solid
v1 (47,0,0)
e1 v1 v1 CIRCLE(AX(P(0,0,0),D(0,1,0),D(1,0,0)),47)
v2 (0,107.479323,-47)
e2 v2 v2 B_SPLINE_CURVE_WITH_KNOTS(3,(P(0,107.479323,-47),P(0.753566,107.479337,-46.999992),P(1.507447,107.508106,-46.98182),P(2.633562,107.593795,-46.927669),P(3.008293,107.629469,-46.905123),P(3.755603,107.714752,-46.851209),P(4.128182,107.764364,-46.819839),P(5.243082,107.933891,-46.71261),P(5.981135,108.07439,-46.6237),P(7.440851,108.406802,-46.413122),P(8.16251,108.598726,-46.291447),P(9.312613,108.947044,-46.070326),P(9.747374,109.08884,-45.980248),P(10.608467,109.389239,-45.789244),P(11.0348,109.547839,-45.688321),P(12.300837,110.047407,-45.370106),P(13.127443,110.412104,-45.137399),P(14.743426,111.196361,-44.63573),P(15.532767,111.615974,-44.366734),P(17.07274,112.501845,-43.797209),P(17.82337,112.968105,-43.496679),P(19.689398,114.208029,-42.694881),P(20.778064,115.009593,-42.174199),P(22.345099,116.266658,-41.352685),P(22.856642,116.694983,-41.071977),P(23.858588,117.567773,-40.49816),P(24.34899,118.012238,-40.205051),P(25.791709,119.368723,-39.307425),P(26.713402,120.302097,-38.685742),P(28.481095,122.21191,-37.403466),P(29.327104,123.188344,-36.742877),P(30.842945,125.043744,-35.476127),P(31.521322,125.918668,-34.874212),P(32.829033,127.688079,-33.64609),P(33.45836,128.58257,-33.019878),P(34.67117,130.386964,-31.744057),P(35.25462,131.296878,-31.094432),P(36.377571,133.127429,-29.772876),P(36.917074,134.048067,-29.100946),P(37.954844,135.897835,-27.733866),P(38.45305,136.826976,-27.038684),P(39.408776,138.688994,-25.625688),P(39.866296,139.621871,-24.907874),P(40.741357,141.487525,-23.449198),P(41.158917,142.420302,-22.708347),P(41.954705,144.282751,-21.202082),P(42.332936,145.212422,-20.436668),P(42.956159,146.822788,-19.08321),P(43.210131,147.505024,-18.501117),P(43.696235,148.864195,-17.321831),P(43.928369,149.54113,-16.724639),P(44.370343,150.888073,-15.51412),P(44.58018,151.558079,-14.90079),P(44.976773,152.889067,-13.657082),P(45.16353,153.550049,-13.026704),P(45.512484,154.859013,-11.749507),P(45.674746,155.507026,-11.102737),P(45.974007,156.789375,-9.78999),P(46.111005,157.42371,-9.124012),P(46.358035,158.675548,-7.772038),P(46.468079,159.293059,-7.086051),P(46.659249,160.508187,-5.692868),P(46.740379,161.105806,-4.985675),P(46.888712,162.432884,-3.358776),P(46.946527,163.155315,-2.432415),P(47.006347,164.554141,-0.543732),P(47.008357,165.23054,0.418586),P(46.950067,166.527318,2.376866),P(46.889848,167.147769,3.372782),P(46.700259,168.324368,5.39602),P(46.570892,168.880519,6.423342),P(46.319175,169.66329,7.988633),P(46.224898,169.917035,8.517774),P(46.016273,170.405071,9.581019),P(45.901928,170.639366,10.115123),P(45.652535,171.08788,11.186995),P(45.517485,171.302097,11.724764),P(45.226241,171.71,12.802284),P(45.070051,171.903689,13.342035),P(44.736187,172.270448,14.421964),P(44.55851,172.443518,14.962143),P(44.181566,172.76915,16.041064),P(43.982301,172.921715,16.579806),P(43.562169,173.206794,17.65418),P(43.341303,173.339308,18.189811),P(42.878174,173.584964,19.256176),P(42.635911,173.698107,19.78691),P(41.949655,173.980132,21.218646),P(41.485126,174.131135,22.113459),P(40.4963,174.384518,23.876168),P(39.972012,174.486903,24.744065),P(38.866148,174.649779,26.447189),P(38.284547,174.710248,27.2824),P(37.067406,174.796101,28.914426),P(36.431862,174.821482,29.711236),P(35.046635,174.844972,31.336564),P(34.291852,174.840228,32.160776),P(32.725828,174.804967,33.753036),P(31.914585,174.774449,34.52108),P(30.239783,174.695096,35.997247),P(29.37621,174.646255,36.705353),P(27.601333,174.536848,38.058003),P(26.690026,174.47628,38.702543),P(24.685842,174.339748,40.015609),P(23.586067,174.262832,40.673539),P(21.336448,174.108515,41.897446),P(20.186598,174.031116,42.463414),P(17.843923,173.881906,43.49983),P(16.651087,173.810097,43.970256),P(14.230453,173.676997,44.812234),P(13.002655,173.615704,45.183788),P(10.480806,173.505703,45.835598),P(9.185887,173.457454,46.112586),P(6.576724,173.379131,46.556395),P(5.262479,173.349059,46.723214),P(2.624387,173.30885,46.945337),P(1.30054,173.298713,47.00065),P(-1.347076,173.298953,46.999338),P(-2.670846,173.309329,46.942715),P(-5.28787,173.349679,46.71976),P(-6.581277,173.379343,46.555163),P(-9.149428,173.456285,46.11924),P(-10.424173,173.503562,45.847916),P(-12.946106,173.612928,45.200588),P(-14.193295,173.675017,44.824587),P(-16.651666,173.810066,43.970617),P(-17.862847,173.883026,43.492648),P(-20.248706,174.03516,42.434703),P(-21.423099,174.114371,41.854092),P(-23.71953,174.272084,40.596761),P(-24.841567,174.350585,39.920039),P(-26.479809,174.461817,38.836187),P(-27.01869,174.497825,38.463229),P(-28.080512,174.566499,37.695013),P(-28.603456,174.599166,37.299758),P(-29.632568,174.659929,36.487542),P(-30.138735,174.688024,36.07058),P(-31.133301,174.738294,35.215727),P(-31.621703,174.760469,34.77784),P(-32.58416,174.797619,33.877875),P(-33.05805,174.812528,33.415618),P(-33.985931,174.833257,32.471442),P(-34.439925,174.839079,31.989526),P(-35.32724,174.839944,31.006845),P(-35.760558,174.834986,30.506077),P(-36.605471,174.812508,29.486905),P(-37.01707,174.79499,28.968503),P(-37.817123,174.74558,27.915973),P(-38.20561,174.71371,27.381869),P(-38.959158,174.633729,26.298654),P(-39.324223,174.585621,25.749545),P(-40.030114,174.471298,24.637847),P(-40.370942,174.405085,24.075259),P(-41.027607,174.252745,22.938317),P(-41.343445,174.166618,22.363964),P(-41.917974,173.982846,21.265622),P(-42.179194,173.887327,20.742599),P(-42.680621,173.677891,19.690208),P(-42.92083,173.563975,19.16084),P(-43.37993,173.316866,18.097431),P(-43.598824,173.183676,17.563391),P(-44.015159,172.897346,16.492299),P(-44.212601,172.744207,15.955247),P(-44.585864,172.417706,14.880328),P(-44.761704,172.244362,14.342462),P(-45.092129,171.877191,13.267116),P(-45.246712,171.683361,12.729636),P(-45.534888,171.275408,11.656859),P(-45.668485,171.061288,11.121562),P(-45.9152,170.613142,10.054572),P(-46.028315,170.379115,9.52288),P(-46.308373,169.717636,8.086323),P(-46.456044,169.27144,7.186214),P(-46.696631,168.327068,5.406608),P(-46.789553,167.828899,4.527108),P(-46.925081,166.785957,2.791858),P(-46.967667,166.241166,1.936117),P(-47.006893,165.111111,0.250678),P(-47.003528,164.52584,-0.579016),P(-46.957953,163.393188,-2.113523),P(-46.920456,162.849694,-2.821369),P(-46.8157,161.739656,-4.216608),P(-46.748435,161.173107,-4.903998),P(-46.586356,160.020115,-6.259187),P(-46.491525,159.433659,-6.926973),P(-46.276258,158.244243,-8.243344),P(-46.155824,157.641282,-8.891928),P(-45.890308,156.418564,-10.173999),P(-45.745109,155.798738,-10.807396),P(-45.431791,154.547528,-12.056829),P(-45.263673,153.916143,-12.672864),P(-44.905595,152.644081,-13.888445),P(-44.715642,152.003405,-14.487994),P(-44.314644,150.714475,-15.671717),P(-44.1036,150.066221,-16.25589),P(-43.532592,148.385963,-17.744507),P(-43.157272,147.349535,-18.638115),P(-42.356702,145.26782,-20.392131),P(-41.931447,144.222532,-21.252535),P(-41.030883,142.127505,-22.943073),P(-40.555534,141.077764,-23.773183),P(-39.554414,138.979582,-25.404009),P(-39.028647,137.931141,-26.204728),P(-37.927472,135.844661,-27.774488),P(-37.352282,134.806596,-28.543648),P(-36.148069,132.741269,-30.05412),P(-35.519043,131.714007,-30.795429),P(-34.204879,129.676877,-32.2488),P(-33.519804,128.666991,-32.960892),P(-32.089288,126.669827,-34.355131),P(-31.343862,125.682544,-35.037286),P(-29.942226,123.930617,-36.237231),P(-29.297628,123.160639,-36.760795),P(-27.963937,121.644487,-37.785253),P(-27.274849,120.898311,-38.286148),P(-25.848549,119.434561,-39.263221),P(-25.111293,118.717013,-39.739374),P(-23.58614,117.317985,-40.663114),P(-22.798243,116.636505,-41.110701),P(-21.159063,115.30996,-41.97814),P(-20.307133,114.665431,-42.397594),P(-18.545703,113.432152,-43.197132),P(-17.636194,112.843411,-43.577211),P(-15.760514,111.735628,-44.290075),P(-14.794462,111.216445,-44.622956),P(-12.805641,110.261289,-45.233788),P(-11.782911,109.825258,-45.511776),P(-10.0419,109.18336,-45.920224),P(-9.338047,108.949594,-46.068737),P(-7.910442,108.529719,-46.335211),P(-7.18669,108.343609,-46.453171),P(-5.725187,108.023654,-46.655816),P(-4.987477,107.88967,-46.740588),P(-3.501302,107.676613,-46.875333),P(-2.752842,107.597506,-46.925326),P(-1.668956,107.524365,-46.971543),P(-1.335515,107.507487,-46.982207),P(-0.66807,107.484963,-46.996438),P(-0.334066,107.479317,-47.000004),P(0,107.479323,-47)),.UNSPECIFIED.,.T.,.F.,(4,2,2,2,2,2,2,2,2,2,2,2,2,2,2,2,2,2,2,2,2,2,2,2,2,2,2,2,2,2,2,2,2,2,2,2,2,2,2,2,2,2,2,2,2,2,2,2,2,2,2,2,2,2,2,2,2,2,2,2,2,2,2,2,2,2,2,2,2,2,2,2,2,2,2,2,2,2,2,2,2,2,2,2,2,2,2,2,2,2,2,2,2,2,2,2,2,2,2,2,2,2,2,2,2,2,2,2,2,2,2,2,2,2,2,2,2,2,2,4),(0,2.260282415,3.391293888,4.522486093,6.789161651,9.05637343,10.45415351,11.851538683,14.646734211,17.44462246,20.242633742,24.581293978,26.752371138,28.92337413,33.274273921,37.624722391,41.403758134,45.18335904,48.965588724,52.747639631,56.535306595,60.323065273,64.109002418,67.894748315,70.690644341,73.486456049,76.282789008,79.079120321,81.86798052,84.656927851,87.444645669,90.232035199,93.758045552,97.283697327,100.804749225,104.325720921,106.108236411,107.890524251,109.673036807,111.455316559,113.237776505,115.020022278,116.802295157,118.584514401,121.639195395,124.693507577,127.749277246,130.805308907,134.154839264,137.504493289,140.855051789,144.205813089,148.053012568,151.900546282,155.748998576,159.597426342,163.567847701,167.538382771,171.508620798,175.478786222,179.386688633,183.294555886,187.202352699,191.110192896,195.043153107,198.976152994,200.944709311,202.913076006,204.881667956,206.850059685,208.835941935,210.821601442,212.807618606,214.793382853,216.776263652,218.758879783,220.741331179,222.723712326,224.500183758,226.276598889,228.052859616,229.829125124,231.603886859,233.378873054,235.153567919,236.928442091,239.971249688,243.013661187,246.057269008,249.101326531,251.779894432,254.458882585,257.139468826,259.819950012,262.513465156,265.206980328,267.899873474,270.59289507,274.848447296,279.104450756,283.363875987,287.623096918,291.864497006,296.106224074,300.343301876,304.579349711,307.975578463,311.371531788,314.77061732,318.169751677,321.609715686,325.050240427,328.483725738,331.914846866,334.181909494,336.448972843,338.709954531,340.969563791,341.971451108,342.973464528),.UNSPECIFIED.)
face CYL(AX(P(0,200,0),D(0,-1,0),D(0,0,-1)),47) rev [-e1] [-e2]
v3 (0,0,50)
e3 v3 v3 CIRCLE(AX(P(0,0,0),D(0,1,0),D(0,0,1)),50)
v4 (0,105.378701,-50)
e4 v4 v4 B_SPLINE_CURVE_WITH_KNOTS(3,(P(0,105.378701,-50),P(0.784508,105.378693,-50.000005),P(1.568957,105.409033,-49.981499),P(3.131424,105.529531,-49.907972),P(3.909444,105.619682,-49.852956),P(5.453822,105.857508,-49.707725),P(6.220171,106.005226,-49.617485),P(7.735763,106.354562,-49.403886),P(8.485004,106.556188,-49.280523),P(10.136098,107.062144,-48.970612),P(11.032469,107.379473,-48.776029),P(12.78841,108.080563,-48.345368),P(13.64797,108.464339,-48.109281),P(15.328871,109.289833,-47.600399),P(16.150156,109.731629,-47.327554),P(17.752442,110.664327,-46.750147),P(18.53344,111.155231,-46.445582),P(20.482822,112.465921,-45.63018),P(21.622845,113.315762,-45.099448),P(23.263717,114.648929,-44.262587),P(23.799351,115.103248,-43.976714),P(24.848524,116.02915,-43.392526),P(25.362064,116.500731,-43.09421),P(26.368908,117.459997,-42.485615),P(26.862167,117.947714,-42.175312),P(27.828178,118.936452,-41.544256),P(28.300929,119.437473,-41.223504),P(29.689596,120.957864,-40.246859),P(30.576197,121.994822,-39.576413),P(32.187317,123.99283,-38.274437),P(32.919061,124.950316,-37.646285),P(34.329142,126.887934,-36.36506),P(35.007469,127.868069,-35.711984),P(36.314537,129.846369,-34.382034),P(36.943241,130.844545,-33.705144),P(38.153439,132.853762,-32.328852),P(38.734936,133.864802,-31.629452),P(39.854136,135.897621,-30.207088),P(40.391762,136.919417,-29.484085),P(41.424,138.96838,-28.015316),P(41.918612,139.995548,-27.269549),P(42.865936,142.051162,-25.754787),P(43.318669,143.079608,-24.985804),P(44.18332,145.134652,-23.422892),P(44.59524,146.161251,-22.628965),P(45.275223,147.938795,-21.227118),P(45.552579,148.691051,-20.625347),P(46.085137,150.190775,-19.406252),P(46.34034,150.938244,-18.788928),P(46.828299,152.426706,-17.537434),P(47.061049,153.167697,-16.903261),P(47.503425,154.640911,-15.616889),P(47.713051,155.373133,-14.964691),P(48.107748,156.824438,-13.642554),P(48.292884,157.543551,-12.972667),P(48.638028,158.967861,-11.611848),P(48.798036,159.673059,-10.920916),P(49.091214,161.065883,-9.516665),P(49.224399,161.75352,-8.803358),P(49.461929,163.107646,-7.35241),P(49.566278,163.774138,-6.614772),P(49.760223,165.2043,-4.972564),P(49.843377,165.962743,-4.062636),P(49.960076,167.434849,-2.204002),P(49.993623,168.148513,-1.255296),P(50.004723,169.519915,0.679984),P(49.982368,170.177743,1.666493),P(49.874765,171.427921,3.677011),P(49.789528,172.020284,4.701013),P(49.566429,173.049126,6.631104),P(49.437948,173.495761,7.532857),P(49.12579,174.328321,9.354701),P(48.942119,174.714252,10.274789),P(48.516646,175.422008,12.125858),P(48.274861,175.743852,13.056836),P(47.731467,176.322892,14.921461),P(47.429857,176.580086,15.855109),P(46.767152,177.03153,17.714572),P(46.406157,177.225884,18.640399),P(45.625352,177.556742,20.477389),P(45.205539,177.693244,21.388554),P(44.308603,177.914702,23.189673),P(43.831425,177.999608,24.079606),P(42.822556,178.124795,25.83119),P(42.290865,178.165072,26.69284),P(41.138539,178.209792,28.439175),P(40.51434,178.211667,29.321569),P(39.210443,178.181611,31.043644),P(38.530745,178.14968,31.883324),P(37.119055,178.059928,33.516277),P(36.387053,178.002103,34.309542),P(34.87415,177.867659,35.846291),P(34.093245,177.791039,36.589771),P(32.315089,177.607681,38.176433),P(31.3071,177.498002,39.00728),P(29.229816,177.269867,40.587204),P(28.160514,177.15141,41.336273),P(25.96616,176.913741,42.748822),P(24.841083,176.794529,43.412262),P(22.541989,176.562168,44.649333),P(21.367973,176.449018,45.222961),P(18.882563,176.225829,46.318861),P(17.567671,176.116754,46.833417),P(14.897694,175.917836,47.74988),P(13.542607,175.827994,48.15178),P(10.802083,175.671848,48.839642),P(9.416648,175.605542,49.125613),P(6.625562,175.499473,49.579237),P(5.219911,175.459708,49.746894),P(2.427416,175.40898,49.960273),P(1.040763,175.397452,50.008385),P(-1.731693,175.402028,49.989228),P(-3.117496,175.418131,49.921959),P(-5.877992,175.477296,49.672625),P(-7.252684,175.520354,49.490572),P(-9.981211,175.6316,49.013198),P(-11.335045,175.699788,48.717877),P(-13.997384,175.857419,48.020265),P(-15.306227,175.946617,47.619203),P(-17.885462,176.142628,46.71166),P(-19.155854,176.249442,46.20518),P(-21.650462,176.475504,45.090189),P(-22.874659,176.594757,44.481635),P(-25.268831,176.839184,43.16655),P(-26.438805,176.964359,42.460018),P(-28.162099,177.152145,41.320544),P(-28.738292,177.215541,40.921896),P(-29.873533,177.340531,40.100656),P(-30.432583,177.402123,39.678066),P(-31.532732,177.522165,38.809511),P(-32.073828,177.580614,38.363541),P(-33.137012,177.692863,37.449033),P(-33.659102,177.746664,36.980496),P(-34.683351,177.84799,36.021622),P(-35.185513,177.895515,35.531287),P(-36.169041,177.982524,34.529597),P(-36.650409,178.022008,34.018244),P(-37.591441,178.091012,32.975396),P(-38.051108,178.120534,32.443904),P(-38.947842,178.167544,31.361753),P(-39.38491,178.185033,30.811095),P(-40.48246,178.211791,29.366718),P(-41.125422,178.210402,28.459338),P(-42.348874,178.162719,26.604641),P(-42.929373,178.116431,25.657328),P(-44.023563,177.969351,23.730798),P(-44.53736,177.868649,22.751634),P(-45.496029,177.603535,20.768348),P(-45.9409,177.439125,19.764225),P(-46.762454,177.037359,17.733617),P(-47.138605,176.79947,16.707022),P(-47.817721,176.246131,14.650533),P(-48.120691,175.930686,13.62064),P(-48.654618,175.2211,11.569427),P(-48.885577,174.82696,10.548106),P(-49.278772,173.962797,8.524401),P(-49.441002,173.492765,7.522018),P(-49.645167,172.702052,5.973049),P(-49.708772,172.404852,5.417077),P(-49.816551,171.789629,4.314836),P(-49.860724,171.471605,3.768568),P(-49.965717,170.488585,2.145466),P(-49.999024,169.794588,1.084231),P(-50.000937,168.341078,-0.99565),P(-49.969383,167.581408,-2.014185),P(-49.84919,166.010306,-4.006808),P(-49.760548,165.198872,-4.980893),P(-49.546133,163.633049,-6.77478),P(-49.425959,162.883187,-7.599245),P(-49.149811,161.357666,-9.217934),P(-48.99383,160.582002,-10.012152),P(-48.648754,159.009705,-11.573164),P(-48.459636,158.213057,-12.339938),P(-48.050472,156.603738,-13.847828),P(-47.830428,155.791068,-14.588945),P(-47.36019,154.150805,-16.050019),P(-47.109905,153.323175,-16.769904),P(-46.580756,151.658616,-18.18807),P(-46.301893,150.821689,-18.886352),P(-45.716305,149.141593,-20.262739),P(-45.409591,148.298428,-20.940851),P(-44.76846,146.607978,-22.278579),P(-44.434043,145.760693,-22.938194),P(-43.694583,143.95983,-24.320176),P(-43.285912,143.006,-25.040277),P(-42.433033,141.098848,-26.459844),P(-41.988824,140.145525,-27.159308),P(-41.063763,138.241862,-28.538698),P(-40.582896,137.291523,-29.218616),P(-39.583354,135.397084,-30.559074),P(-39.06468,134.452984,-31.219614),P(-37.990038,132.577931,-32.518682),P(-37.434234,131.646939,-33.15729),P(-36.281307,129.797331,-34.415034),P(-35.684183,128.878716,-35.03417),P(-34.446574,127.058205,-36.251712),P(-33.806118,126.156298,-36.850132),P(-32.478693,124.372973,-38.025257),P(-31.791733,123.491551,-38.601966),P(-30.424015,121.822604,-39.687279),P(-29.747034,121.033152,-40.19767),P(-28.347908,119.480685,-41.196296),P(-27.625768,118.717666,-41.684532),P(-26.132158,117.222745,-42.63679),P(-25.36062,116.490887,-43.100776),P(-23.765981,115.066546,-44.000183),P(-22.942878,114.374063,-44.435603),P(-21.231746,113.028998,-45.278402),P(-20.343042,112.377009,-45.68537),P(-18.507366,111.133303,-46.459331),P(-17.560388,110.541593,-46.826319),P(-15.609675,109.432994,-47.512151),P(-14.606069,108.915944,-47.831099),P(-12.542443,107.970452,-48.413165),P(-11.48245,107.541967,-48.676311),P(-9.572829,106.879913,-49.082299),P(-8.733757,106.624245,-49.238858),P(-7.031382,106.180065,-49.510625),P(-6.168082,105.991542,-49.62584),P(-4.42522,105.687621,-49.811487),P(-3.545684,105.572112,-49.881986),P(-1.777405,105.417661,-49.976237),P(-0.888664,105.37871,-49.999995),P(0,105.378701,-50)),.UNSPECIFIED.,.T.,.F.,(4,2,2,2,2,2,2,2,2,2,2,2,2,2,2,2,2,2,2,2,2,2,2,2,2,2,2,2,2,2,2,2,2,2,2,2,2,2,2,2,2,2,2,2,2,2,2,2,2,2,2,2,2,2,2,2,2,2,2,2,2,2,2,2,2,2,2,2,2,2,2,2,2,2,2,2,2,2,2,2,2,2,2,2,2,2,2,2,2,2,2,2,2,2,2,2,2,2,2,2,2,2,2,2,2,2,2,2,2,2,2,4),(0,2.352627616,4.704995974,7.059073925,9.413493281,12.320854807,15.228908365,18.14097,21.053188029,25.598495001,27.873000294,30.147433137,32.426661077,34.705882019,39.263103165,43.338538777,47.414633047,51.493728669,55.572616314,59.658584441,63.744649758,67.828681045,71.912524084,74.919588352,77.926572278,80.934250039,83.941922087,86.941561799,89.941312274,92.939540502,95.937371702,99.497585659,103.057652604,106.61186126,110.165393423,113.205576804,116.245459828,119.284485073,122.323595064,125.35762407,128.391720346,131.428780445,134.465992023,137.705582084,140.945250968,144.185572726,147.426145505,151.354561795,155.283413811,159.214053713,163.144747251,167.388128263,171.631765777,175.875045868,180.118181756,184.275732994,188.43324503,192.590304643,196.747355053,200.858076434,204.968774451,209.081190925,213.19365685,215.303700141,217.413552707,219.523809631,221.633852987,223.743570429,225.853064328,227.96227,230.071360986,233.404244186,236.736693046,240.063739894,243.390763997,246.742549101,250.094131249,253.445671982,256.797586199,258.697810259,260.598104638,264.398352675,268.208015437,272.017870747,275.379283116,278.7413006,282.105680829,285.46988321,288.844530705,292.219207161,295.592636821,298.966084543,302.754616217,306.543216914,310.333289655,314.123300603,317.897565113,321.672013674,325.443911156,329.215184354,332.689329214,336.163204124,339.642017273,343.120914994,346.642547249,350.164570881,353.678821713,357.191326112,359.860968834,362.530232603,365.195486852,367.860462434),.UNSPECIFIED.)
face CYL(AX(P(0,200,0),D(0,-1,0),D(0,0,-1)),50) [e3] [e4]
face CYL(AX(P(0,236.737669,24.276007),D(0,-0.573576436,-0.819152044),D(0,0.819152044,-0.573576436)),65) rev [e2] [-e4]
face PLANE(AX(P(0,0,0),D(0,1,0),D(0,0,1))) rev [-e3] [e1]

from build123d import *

# Parameters (mm, degrees)
EXTRUDE_1_OUTLINE_R      = 50
EXTRUDE_1_OUTLINE_R_2    = 47
EXTRUDE_1_DEPTH          = 200
CUT_EXTRUDE_1_DEPTH      = 213.132034356
CUT_EXTRUDE_1_DEPTH_BACK = 213.132034356
SKETCH_2_R               = 65


# Read off the part's stored shape, not the designer's step: Вытянуть-Тонкостенный1
with BuildPart() as part:
    # Вытянуть-Тонкостенный1 outline → Вытянуть-Тонкостенный1 (new body)
    with BuildSketch(Plane(origin=(0, 0, 0), x_dir=(1, 0, 0), z_dir=(0, 1, 0))):
        Circle(EXTRUDE_1_OUTLINE_R)
        Circle(EXTRUDE_1_OUTLINE_R_2, mode=Mode.SUBTRACT)
    extrude(amount=EXTRUDE_1_DEPTH)

    # Эскиз2 → Вырез-Вытянуть1 (cut, two sides: drawn at the far end of the back side and taken through both)
    with BuildSketch(Plane(origin=(0, 0, 0), x_dir=(1, 0, 0), z_dir=(0, -0.5735764363510444, -0.819152044288993)).offset(-CUT_EXTRUDE_1_DEPTH_BACK)):
        with Locations((0, -180)):
            Circle(SKETCH_2_R)
    extrude(amount=CUT_EXTRUDE_1_DEPTH + CUT_EXTRUDE_1_DEPTH_BACK, mode=Mode.SUBTRACT)


solid = part.part
